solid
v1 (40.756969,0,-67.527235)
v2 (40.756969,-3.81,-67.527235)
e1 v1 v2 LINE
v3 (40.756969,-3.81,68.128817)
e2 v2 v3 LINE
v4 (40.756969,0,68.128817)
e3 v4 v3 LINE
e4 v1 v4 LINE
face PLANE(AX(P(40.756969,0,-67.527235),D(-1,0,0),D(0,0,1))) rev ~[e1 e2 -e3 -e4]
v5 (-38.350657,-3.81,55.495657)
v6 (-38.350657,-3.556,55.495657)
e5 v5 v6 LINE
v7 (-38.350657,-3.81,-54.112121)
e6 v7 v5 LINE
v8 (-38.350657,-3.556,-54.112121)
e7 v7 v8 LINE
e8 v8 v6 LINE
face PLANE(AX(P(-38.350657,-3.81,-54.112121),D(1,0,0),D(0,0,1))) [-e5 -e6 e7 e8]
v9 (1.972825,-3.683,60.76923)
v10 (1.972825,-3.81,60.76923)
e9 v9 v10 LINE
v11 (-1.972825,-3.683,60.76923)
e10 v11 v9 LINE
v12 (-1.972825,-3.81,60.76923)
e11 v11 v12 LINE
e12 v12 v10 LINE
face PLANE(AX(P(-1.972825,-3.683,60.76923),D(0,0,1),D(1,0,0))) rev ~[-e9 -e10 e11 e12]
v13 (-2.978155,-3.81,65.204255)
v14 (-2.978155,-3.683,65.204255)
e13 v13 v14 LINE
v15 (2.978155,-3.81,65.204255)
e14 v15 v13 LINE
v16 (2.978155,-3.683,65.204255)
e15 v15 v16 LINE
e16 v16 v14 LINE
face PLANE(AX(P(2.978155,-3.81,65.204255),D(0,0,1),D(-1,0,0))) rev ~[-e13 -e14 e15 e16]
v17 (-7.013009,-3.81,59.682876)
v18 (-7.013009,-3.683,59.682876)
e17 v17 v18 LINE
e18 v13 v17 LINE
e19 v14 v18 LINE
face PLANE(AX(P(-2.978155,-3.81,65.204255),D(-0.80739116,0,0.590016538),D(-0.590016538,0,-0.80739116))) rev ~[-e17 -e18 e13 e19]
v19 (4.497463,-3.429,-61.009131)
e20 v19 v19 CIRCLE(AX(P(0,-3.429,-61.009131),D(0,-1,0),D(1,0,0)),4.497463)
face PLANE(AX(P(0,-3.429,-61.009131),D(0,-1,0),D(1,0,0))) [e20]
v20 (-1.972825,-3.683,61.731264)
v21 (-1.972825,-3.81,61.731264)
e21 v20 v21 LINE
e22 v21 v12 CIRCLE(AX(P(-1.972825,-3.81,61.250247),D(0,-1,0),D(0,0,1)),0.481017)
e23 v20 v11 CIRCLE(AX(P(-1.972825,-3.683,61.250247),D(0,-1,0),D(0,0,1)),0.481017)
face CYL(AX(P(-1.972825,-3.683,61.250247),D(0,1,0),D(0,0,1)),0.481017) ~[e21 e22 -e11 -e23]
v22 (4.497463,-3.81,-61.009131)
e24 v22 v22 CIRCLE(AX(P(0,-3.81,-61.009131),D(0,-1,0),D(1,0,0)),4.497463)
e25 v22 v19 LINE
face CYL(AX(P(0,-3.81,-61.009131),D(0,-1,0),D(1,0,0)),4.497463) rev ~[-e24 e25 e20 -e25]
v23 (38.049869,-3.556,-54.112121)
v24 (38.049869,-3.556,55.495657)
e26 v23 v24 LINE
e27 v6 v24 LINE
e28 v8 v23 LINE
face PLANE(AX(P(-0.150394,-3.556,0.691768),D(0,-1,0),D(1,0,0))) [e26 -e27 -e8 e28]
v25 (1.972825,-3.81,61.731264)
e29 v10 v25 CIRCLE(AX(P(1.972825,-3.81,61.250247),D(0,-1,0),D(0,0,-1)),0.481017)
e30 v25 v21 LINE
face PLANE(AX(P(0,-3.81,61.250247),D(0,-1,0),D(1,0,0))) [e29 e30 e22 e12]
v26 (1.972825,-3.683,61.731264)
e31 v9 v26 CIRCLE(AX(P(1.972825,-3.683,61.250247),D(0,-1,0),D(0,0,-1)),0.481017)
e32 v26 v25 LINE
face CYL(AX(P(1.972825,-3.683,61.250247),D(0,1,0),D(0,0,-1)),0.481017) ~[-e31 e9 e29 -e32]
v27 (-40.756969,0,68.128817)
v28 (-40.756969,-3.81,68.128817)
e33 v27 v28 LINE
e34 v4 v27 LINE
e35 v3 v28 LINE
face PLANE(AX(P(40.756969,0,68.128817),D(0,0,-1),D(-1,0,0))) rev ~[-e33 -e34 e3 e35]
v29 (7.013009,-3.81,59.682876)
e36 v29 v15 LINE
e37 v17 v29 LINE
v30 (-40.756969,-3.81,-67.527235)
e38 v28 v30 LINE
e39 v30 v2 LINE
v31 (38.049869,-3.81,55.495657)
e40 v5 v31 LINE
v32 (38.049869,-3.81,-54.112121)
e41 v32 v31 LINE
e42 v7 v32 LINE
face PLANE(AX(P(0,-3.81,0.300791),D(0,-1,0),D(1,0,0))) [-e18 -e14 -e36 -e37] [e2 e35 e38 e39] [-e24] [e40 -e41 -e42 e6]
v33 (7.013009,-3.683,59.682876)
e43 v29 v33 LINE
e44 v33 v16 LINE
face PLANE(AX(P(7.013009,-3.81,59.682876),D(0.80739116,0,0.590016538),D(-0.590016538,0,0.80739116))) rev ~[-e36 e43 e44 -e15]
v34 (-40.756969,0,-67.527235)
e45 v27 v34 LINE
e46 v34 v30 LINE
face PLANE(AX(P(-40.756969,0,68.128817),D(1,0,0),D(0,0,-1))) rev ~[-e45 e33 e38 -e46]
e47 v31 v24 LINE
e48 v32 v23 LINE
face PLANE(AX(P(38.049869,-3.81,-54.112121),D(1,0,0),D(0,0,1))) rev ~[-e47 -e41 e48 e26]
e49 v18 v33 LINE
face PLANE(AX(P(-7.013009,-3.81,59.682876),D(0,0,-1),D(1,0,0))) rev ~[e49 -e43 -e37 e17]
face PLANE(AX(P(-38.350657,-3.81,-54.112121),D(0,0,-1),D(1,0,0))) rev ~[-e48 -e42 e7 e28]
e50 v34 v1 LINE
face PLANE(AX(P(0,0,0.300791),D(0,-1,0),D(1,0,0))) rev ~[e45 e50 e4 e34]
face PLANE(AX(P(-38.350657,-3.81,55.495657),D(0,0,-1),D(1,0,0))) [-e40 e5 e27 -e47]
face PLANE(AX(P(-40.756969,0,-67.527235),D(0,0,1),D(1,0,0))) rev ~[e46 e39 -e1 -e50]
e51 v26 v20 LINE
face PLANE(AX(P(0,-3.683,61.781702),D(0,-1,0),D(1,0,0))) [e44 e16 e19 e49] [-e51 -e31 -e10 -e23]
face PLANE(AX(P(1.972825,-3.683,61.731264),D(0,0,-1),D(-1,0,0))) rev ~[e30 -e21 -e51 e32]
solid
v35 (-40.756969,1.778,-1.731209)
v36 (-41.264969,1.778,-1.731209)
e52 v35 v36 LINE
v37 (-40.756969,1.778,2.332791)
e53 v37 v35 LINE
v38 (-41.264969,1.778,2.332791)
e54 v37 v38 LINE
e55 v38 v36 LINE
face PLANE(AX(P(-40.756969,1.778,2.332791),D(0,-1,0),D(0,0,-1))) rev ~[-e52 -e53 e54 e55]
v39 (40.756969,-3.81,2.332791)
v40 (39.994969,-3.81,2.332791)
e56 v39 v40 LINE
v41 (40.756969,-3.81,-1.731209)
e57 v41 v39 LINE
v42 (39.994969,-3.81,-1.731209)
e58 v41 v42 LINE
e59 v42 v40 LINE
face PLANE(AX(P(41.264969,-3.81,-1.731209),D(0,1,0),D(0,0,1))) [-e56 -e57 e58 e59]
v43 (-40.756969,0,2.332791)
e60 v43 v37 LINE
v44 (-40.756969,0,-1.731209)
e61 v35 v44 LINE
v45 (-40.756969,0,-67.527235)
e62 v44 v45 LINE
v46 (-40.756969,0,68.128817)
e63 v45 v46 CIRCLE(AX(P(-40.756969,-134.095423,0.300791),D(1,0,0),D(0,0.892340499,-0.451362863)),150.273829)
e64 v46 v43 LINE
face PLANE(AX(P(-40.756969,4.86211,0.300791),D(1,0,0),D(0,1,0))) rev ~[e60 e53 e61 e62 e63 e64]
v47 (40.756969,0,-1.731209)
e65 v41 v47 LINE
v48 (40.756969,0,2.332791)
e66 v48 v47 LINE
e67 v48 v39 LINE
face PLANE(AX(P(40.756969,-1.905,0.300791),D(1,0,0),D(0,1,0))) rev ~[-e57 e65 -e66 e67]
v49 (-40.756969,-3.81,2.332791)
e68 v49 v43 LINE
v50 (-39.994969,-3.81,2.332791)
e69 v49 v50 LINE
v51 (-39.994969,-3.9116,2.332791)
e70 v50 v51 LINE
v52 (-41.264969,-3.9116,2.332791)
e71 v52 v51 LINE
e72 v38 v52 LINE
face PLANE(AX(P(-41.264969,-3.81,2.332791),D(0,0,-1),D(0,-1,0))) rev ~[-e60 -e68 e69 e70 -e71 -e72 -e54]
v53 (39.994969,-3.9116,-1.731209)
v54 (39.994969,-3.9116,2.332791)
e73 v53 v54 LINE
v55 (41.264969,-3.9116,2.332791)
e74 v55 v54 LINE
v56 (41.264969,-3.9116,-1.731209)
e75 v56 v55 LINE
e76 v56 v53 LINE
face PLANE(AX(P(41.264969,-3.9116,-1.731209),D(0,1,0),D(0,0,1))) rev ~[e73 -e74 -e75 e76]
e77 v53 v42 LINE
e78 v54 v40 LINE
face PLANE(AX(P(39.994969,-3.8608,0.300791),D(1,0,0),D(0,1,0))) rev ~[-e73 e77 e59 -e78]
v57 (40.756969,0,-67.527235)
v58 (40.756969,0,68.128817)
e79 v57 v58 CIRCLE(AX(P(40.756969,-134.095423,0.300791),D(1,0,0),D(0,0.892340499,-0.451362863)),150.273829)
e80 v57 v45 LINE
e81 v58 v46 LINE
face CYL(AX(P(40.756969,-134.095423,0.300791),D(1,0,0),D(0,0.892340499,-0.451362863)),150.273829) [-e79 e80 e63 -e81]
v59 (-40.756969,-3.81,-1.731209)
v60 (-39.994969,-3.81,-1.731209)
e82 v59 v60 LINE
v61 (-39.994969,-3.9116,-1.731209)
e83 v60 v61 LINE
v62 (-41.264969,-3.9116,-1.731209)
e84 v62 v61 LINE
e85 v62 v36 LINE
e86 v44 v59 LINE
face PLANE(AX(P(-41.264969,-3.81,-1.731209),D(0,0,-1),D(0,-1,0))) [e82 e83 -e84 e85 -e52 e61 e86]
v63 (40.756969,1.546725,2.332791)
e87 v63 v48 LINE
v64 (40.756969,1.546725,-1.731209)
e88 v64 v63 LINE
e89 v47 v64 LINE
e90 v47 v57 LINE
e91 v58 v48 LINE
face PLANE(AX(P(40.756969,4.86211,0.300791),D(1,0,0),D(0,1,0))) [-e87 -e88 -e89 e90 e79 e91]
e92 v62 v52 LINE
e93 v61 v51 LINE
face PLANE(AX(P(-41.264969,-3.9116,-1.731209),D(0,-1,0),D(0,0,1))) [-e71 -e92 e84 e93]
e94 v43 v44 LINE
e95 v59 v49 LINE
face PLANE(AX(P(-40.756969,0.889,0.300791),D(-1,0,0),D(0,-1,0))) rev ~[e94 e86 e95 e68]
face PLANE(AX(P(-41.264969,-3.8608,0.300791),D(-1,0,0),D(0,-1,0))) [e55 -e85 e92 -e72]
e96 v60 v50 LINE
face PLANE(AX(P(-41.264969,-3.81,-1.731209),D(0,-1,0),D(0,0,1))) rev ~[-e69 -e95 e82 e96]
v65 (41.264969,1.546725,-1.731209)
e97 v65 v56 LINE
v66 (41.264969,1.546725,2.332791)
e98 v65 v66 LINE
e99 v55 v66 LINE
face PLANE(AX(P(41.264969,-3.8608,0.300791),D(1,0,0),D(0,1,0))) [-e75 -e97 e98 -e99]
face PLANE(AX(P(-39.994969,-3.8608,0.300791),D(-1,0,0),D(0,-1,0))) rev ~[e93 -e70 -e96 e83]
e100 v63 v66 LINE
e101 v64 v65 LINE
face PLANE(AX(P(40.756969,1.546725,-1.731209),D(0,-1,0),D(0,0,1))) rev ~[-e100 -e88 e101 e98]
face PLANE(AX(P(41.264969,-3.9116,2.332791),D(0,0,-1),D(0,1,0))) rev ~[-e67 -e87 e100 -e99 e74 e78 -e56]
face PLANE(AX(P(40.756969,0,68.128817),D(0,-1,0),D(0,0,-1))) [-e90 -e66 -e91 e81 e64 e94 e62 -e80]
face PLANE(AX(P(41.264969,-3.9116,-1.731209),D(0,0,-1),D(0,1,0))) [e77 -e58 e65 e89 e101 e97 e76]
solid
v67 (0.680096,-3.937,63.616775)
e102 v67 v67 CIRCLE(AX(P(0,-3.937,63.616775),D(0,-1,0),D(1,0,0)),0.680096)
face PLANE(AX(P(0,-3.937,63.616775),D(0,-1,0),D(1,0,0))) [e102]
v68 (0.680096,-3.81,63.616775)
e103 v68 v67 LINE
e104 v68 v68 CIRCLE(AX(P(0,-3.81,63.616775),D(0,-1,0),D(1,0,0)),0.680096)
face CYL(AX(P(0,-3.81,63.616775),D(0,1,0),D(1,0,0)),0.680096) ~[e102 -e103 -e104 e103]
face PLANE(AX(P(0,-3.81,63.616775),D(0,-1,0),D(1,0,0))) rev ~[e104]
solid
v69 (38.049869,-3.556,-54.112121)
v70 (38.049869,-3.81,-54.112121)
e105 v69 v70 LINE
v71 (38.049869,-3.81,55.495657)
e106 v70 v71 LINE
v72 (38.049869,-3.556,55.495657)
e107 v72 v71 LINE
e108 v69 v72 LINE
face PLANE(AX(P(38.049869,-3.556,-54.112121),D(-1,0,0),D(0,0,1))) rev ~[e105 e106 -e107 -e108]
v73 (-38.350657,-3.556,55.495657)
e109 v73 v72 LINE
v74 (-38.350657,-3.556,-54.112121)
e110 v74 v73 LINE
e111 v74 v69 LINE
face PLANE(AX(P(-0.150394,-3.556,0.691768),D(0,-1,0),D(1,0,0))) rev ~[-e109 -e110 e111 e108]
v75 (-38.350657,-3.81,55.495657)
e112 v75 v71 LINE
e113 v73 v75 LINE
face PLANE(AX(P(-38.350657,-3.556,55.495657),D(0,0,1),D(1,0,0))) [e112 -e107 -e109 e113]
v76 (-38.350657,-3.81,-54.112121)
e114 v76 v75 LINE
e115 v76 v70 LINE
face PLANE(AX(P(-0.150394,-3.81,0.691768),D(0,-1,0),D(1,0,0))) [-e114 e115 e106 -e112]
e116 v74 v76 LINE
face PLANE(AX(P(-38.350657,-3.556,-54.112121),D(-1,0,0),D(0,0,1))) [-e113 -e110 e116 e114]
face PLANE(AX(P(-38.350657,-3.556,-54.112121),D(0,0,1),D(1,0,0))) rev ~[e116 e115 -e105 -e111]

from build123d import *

# Parameters (mm, degrees)
F1_DEPTH  = 3.81
F2_W      = 76.4005258679
F2_H      = 109.6077784896
F3_DEPTH  = 0.254
F4_W      = 76.4005258679
F4_H      = 109.6077784896
F5_DEPTH  = 0.254
F6_R      = 0.6800962697
F7_DEPTH  = 0.127
F8_DEPTH  = 0.127
F9_DEPTH  = 0.127
F2_R      = 4.4974633364
F10_DEPTH = 0.381
F12_DEPTH = 81.5139375627
F14_DEPTH = 0.127
F15_W     = 3.81
F15_H     = 4.064
F16_DEPTH = 0.508
F17_W     = 0.1016
F17_H     = 4.064
F18_DEPTH = 1.27
F20_DEPTH = 0.508
F21_W     = 0.1016
F21_H     = 4.064
F22_DEPTH = 1.27


with BuildPart() as f1:
    # F0 (on Front) → F1 (new body)
    with BuildSketch(Plane.XZ):
        Polygon((-40.7569687814, -67.5272345543), (0, -67.5272345543), (40.7569687814, -67.5272345543), (40.7569687814, 68.1288167834), (0, 68.1288167834), (-40.7569687814, 68.1288167834), align=None)
    extrude(amount=F1_DEPTH)

    # F2 (on face) → F3 (cut)
    with BuildSketch(Plane.XZ.offset(3.81)):
        with Locations((-0.1503936946, 0.691767782)):
            Rectangle(F2_W, F2_H)
    extrude(amount=-F3_DEPTH, mode=Mode.SUBTRACT)

    # F6 (on face) → F7 (cut)
    with BuildSketch(Plane.XZ.offset(3.81)):
        Polygon((2.9781554878, 65.2042552829), (0, 65.2042552829), (-2.9781554878, 65.2042552829), (-7.0130091316, 59.6828758717), (0, 59.6828758717), (7.0130091316, 59.6828758717), align=None)
        with Locations((0, 63.6167749763)):
            Circle(F6_R, mode=Mode.SUBTRACT)
    extrude(amount=-F7_DEPTH, mode=Mode.SUBTRACT)

    # F8 (cut): a face of the model
    f8_faces = [f1.faces().sort_by_distance(p)[0] for p in [
        (0, -3.81, 63.6167749763),
    ]]
    extrude(f8_faces, amount=-F8_DEPTH, mode=Mode.SUBTRACT)

    # F2 (on face) → F10 (cut)
    with BuildSketch(Plane.XZ.offset(3.81)):
        with Locations((0, -61.009131372)):
            Circle(F2_R)
    extrude(amount=-F10_DEPTH, mode=Mode.SUBTRACT)

    # F13 (on face) → F14 (join)
    with BuildSketch(Plane.XZ.offset(3.683)):
        with BuildLine():
            Line((1.9728252664, 61.7312639952), (0, 61.7312639952))
            Line((0, 61.7312639952), (-1.9728252664, 61.7312639952))
            ThreePointArc((-1.9728252664, 61.7312639952), (-2.4538422003, 61.2502470613), (-1.9728252664, 60.7692301273))
            Line((-1.9728252664, 60.7692301273), (0, 60.7692301273))
            Line((0, 60.7692301273), (1.9728252664, 60.7692301273))
            ThreePointArc((1.9728252664, 60.7692301273), (2.4538422003, 61.2502470613), (1.9728252664, 61.7312639952))
        make_face()
    extrude(amount=F14_DEPTH)


with BuildPart() as f5:
    # F4 (on face) → F5 (new body)
    with BuildSketch(Plane.XZ.offset(3.556)):
        with Locations((-0.1503936946, 0.691767782)):
            Rectangle(F4_W, F4_H)
    extrude(amount=F5_DEPTH)


with BuildPart() as f9:
    # F6 (on face) → F9 (new body)
    with BuildSketch(Plane.XZ.offset(3.81)):
        with Locations((0, 63.6167749763)):
            Circle(F6_R)
    extrude(amount=F9_DEPTH)


with BuildPart() as f12:
    # F11 (on face) → F12 (new body, through all)
    with BuildSketch(Plane.YZ.offset(40.7569687814)):
        with BuildLine():
            Line((0, 68.1288167834), (0, -67.5272345543))
            ThreePointArc((0, -67.5272345543), (16.1784054614, 0.3007911146), (0, 68.1288167834))
        make_face()
    extrude(amount=-F12_DEPTH)

    # F15 (on face) → F16 (join)
    with BuildSketch(Plane.YZ.offset(40.7569687814)):
        with Locations((-1.905, 0.3007911146)):
            Rectangle(F15_W, F15_H)
        Polygon((1.5467249905, -1.7312088854), (1.5467249905, 0.3007911146), (1.5467249905, 2.3327911146), (0, 2.3327911146), (0, -1.7312088854), align=None)
    extrude(amount=F16_DEPTH)

    # F17 (on face) → F18 (join)
    with BuildSketch(Plane.YZ.offset(41.2649687814)):
        with Locations((-3.8608, 0.3007911146)):
            Rectangle(F17_W, F17_H)
    extrude(amount=-F18_DEPTH)

    # F19 (on face) → F20 (join)
    with BuildSketch(Plane(origin=(-40.7569687814, 0, 0), x_dir=(0, -1, 0), z_dir=(-1, 0, 0))):
        Polygon((0, -1.7312088854), (0, 2.3327911146), (-1.778, 2.3327911146), (-1.778, 0.3007911146), (-1.778, -1.7312088854), align=None)
        Polygon((3.81, -1.7312088854), (3.81, 0.3007911146), (3.81, 2.3327911146), (0, 2.3327911146), (0, -1.7312088854), align=None)
    extrude(amount=F20_DEPTH)

    # F21 (on face) → F22 (join)
    with BuildSketch(Plane(origin=(-41.2649687814, 0, 0), x_dir=(0, -1, 0), z_dir=(-1, 0, 0))):
        with Locations((3.8608, 0.3007911146)):
            Rectangle(F21_W, F21_H)
    extrude(amount=-F22_DEPTH)


solid = Compound([f1.part, f5.part, f9.part, f12.part])
